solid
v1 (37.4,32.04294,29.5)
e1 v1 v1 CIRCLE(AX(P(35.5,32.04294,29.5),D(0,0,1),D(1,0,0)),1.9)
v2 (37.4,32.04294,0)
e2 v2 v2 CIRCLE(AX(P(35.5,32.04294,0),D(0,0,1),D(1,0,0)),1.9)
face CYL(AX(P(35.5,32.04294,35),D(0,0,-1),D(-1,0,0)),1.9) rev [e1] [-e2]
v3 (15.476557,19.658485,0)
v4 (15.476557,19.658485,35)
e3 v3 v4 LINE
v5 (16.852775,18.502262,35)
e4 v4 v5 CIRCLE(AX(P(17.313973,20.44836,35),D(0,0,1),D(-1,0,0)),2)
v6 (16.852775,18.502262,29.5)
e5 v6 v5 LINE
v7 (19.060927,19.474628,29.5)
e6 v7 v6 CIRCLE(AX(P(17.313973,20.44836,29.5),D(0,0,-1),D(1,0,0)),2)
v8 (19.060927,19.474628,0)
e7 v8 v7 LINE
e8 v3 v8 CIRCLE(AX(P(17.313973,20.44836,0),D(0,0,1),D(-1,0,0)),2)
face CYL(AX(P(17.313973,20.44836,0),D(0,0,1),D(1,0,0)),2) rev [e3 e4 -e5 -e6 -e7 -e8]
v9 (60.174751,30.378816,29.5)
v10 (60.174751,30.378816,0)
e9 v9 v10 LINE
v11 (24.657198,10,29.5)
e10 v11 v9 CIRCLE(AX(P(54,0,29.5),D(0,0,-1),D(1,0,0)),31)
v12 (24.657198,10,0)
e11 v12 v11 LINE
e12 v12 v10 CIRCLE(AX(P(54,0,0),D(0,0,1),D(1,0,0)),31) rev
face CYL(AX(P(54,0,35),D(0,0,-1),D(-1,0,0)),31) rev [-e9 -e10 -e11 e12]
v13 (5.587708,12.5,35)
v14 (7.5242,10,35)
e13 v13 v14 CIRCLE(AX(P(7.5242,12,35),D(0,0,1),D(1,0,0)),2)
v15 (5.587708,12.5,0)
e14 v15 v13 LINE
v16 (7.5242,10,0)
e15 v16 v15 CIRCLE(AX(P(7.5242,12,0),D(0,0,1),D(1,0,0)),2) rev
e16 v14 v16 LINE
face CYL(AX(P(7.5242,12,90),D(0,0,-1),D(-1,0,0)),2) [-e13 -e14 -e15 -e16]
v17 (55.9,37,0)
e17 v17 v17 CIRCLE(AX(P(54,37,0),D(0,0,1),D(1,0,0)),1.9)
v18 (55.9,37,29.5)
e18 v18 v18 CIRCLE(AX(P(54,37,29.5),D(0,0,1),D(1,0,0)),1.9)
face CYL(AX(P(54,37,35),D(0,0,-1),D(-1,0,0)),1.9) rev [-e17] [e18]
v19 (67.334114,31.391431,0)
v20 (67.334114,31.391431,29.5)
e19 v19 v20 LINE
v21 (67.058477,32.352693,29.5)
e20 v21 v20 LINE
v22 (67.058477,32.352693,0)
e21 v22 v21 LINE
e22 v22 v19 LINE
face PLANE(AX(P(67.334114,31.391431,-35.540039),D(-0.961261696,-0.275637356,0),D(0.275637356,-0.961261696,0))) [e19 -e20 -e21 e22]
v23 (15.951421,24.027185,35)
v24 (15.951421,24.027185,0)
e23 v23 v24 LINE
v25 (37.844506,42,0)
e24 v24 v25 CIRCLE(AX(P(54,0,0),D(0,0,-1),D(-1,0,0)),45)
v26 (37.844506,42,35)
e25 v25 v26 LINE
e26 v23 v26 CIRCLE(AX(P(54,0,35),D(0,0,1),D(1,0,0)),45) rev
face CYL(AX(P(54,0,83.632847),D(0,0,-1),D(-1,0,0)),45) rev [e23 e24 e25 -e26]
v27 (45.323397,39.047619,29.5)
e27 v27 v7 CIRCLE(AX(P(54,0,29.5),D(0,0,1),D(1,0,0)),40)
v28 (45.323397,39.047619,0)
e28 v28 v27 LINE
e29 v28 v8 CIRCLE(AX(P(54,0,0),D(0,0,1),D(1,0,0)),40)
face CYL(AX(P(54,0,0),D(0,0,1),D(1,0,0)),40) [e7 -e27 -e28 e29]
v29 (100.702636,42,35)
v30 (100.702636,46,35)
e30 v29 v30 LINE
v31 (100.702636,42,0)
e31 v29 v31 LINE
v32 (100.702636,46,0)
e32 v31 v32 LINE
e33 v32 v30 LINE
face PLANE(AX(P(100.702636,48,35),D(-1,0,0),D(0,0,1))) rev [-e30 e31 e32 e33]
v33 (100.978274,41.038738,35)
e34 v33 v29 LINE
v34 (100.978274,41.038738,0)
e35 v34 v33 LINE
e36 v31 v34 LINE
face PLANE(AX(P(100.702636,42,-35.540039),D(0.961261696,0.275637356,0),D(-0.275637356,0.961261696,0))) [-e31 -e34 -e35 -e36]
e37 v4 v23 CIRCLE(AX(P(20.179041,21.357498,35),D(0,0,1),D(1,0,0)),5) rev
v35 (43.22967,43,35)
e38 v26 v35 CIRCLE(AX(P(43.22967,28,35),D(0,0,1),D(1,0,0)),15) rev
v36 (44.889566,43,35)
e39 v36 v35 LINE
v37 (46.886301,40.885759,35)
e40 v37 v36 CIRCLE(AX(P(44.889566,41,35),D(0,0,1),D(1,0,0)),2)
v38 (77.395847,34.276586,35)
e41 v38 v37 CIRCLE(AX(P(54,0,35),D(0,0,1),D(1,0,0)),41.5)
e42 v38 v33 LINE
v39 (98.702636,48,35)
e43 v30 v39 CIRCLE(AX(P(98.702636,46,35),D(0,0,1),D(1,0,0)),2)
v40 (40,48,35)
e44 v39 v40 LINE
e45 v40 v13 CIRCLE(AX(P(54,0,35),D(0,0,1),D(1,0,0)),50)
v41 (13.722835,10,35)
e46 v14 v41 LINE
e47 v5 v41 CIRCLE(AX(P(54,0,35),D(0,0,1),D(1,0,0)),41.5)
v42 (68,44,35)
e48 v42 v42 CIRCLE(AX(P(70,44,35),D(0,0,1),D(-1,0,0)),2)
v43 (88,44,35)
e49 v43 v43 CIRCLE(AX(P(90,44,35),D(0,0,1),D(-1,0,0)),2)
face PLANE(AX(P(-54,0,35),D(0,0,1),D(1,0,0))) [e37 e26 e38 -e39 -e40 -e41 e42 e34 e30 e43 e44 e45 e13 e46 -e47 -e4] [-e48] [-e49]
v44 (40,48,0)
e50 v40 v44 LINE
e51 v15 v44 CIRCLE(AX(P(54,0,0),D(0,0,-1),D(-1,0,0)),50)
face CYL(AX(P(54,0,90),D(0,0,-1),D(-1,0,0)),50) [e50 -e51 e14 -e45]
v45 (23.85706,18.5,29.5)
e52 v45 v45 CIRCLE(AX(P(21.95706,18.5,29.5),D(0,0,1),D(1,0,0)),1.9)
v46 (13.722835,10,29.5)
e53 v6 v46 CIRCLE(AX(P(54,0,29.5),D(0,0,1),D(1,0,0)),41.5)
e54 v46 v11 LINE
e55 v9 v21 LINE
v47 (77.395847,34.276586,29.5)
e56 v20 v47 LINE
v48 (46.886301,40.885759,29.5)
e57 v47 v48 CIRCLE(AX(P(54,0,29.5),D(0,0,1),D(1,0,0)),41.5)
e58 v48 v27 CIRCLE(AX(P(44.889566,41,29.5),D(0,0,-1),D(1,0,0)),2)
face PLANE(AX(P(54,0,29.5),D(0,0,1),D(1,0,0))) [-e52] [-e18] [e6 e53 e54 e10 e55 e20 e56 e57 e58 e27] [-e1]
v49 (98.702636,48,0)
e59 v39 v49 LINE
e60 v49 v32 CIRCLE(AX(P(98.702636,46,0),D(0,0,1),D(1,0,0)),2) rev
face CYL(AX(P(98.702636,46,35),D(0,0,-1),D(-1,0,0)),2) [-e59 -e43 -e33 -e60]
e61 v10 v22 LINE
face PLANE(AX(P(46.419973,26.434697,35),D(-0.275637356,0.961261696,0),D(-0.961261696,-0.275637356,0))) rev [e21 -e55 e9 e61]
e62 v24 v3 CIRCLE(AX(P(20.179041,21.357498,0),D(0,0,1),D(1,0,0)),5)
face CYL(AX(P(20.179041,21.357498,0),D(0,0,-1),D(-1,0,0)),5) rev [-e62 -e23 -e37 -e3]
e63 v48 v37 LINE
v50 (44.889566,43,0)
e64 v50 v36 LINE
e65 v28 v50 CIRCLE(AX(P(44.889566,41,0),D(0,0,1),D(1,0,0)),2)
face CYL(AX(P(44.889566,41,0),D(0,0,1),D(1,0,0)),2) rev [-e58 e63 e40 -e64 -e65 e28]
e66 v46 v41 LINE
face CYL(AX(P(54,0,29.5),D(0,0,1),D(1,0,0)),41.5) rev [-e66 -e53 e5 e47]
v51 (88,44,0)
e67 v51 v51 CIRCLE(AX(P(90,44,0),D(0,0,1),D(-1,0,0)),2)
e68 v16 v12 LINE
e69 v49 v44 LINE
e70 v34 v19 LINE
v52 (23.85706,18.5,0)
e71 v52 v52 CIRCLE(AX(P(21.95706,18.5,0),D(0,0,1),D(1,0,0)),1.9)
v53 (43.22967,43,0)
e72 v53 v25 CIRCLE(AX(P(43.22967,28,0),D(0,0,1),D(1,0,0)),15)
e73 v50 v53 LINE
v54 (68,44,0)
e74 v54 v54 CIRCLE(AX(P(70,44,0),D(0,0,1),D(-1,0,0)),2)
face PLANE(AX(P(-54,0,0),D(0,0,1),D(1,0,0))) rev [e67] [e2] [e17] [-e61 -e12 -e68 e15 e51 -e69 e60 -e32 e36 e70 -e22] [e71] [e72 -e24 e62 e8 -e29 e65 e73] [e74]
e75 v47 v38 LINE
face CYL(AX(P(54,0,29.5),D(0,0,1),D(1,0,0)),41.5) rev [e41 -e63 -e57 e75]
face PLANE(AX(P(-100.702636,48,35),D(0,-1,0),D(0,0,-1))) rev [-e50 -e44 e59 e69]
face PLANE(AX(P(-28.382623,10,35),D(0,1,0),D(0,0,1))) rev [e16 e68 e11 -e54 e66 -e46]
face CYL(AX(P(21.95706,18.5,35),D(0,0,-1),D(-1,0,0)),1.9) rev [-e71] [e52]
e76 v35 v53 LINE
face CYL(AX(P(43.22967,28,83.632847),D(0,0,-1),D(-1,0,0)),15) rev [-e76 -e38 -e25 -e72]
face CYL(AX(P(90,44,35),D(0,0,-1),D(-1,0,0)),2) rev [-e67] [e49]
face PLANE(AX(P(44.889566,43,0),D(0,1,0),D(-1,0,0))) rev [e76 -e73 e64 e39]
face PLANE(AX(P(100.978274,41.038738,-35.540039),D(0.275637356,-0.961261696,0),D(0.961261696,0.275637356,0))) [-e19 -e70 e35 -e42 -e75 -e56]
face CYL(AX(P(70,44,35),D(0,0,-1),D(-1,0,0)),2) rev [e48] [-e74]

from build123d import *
from build123d.topology import SkipClean

# Parameters (mm, degrees)
SKETCH_1_R          = 1.9
SKETCH_1_R_2        = 2
EXTRUDE_1_DEPTH     = 35
EXTRUDE_2_DEPTH     = 35
CUT_EXTRUDE_1_DEPTH = 118.156356153
SKETCH_4_R          = 41.5
CUT_EXTRUDE_2_DEPTH = 5.5
SKETCH_5_R          = 31
CUT_EXTRUDE_3_DEPTH = 116.632442624
SKETCH_6_R          = 2
CUT_EXTRUDE_4_DEPTH = 90
EXTRUDE_3_DEPTH     = 35
FILLET_1_R          = 15
FILLET_2_R          = 5
FILLET_3_R          = 2
CUT_EXTRUDE_START   = -5.5
CUT_EXTRUDE_5_DEPTH = 5.5
EXTRUDE_START       = 5.5
SKETCH_9_R          = 1.9
EXTRUDE_4_DEPTH     = 5.5


with BuildPart() as part:
    # 草图1 → 凸台-拉伸1 (new body)
    with BuildSketch(Plane.XY):
        with BuildLine():
            Line((-46.419972715, 26.434696638), (-100.702636481, 42))
            Line((-100.702636481, 42), (-100.702636481, 48))
            Line((-100.702636481, 48), (100.702636481, 48))
            Line((100.702636481, 48), (100.702636481, 42))
            Line((100.702636481, 42), (46.419972715, 26.434696638))
            ThreePointArc((46.419972715, 26.434696638), (35.478614393, 20.327525063), (28.382623085, 10))
            Line((28.382623085, 10), (-28.382623085, 10))
            ThreePointArc((-28.382623085, 10), (-35.478614393, 20.327525063), (-46.419972715, 26.434696638))
        make_face()
        with Locations((-54, 37)):
            Circle(SKETCH_1_R, mode=Mode.SUBTRACT)
        with Locations((-35.5, 32.04293994)):
            Circle(SKETCH_1_R, mode=Mode.SUBTRACT)
        with Locations((-21.95706006, 18.5)):
            Circle(SKETCH_1_R, mode=Mode.SUBTRACT)
        with Locations(Location((21.95706006, 18.5, 0), (0, 0, 180))):
            Circle(SKETCH_1_R, mode=Mode.SUBTRACT)
        with Locations(Location((35.5, 32.04293994, 0), (0, 0, 180))):
            Circle(SKETCH_1_R, mode=Mode.SUBTRACT)
        with Locations(Location((54, 37, 0), (0, 0, 180))):
            Circle(SKETCH_1_R, mode=Mode.SUBTRACT)
        with Locations((-90, 44)):
            Circle(SKETCH_1_R_2, mode=Mode.SUBTRACT)
        with Locations((-70, 44)):
            Circle(SKETCH_1_R_2, mode=Mode.SUBTRACT)
        with Locations(Location((70, 44, 0), (0, 0, 180))):
            Circle(SKETCH_1_R_2, mode=Mode.SUBTRACT)
        with Locations(Location((90, 44, 0), (0, 0, 180))):
            Circle(SKETCH_1_R_2, mode=Mode.SUBTRACT)
    extrude(amount=EXTRUDE_1_DEPTH)

    # 草图2 → 凸台-拉伸2 (add)
    with BuildSketch(Plane.XY.offset(35)):
        Polygon((-100.702636481, 42), (-100.978273837, 41.038738304), (-67.334114479, 31.39143085), (-67.058477124, 32.352692546), align=None)
        Polygon((67.058477124, 32.352692546), (100.702636481, 42), (100.978273837, 41.038738304), (67.334114479, 31.39143085), align=None)
    extrude(amount=-EXTRUDE_2_DEPTH)

    # 草图3 → 切除-拉伸1 (cut, through all)
    with BuildSketch(Plane.XY.offset(35)):
        with BuildLine():
            Line((-6.641746516, 40.210125207), (-15.476556882, 19.658485028))
            ThreePointArc((-15.476556882, 19.658485028), (-17.211519663, 18.450985714), (-19.06092662, 19.474628401))
            ThreePointArc((-19.06092662, 19.474628401), (-30.09691848, 32.072460053), (-45.323396591, 39.047619048))
            ThreePointArc((-45.323396591, 39.047619048), (-46.877626016, 41.21821789), (-44.889566421, 43))
            Line((-44.889566421, 43), (-8.479162585, 43))
            ThreePointArc((-8.479162585, 43), (-6.808870756, 42.100056911), (-6.641746516, 40.210125207))
        make_face()
        with BuildLine():
            Line((-10.837416069, 17.789874793), (-1.837416069, 38.725781047))
            ThreePointArc((-1.837416069, 38.725781047), (0, 39.935906254), (1.837416069, 38.725781047))
            Line((1.837416069, 38.725781047), (10.837416069, 17.789874793))
            ThreePointArc((10.837416069, 17.789874793), (10.670291829, 15.899943089), (9, 15))
            Line((9, 15), (-9, 15))
            ThreePointArc((-9, 15), (-10.670291829, 15.899943089), (-10.837416069, 17.789874793))
        make_face()
        with BuildLine():
            Line((44.889566421, 43), (8.479162585, 43))
            ThreePointArc((8.479162585, 43), (6.808870756, 42.100056911), (6.641746516, 40.210125207))
            Line((6.641746516, 40.210125207), (15.476556882, 19.658485028))
            ThreePointArc((15.476556882, 19.658485028), (17.211519663, 18.450985714), (19.06092662, 19.474628401))
            ThreePointArc((19.06092662, 19.474628401), (30.09691848, 32.072460053), (45.323396591, 39.047619048))
            ThreePointArc((45.323396591, 39.047619048), (46.877626016, 41.21821789), (44.889566421, 43))
        make_face()
    extrude(amount=-CUT_EXTRUDE_1_DEPTH, mode=Mode.SUBTRACT)

    # 草图4 → 切除-拉伸2 (cut)
    with BuildSketch(Plane(origin=(0, 0, 0), x_dir=(-1, 0, 0), z_dir=(0, 0, -1))):
        with Locations((54, 0)):
            Circle(SKETCH_4_R)
        with Locations((-54, 0)):
            Circle(SKETCH_4_R)
    extrude(amount=-CUT_EXTRUDE_2_DEPTH, mode=Mode.SUBTRACT)

    # 草图5 → 切除-拉伸3 (cut, through all)
    with BuildSketch(Plane(origin=(0, 0, 5.5), x_dir=(-1, 0, 0), z_dir=(0, 0, -1))):
        with Locations((-54, 0)):
            Circle(SKETCH_5_R)
        with Locations((54, 0)):
            Circle(SKETCH_5_R)
    extrude(amount=-CUT_EXTRUDE_3_DEPTH, mode=Mode.SUBTRACT)

    # 草图6 → 切除-拉伸4 (cut)
    # profile 1 of 2: a face of its own
    with BuildSketch(Plane(origin=(0, 0, 0), x_dir=(-1, 0, 0), z_dir=(0, 0, -1))):
        with BuildLine():
            Line((112.236741432, 87.655163383), (-13.983884749, 87.655163383))
            Line((-13.983884749, 87.655163383), (-42.229785629, 48.594876825))
            ThreePointArc((-42.229785629, 48.594876825), (-41.111460254, 48.310304731), (-40, 48))
            Line((-40, 48), (100.702636481, 48))
            Line((100.702636481, 48), (100.702636481, 42))
            Line((100.702636481, 42), (100.978273837, 41.038738304))
            Line((100.978273837, 41.038738304), (77.395846699, 34.276586137))
            ThreePointArc((77.395846699, 34.276586137), (62.786203664, 40.559248331), (46.886301002, 40.88575897))
            ThreePointArc((46.886301002, 40.88575897), (46.343609415, 42.373229395), (44.889566421, 43))
            Line((44.889566421, 43), (8.479162585, 43))
            ThreePointArc((8.479162585, 43), (6.808870756, 42.100056911), (6.641746516, 40.210125207))
            Line((6.641746516, 40.210125207), (15.476556882, 19.658485028))
            ThreePointArc((15.476556882, 19.658485028), (16.027458608, 18.917059445), (16.852775325, 18.502261995))
            ThreePointArc((16.852775325, 18.502261995), (15.05508847, 14.336801105), (13.722835254, 10))
            Line((13.722835254, 10), (-5.010205144, 10))
            ThreePointArc((-5.010205144, 10), (-4.25319235, 5.0254481), (-4, 0))
            Line((-4, 0), (108.733946442, 6.013095543))
            Line((108.733946442, 6.013095543), (112.236741432, 87.655163383))
        make_face()
    # profile 2 of 2: a face of its own
    with BuildSketch(Plane(origin=(0, 0, 0), x_dir=(-1, 0, 0), z_dir=(0, 0, -1))):
        with BuildLine():
            Line((100.702636481, 48), (-40, 48))
            ThreePointArc((-40, 48), (-34.085108298, 45.862807246), (-28.485298356, 43))
            Line((-28.485298356, 43), (-8.479162585, 43))
            ThreePointArc((-8.479162585, 43), (-6.808870756, 42.100056911), (-6.641746516, 40.210125207))
            Line((-6.641746516, 40.210125207), (-12.159497891, 27.374666815))
            ThreePointArc((-12.159497891, 27.374666815), (-10.524900739, 24.696472303), (-9.061502157, 21.921026701))
            Line((-9.061502157, 21.921026701), (-1.837416069, 38.725781047))
            ThreePointArc((-1.837416069, 38.725781047), (0, 39.935906254), (1.837416069, 38.725781047))
            Line((1.837416069, 38.725781047), (10.837416069, 17.789874793))
            ThreePointArc((10.837416069, 17.789874793), (10.670291829, 15.899943089), (9, 15))
            Line((9, 15), (-6.303039929, 15))
            ThreePointArc((-6.303039929, 15), (-5.592023957, 12.516703058), (-5.010205144, 10))
            Line((-5.010205144, 10), (13.722835254, 10))
            ThreePointArc((13.722835254, 10), (15.05508847, 14.336801105), (16.852775325, 18.502261995))
            ThreePointArc((16.852775325, 18.502261995), (16.027458608, 18.917059445), (15.476556882, 19.658485028))
            Line((15.476556882, 19.658485028), (6.641746516, 40.210125207))
            ThreePointArc((6.641746516, 40.210125207), (6.808870756, 42.100056911), (8.479162585, 43))
            Line((8.479162585, 43), (44.889566421, 43))
            ThreePointArc((44.889566421, 43), (46.343609415, 42.373229395), (46.886301002, 40.88575897))
            ThreePointArc((46.886301002, 40.88575897), (62.786203664, 40.559248331), (77.395846699, 34.276586137))
            Line((77.395846699, 34.276586137), (100.978273837, 41.038738304))
            Line((100.978273837, 41.038738304), (100.702636481, 42))
            Line((100.702636481, 42), (100.702636481, 48))
        make_face()
        with Locations((70, 44)):
            Circle(SKETCH_6_R, mode=Mode.SUBTRACT)
        with Locations((90, 44)):
            Circle(SKETCH_6_R, mode=Mode.SUBTRACT)
    extrude(amount=-CUT_EXTRUDE_4_DEPTH, mode=Mode.SUBTRACT)

    # 草图7 → 凸台-拉伸3 (add)
    with SkipClean():  # the faces are left unmerged after this step: merging them gives an invalid solid
        with BuildSketch(Plane(origin=(0, 0, 0), x_dir=(-1, 0, 0), z_dir=(0, 0, -1))):
            with BuildLine():
                ThreePointArc((-5.010205144, 10), (-13.25714787, 28.983098529), (-28.485298356, 43))
                Line((-28.485298356, 43), (-40.733500839, 43))
                ThreePointArc((-40.733500839, 43), (-21.007081908, 30.601754129), (-10.125178063, 10))
                Line((-10.125178063, 10), (-5.010205144, 10))
            make_face()
        extrude(amount=-EXTRUDE_3_DEPTH)

    # 圆角1
    fillet_1_edges = [part.edges().sort_by_distance(p)[0] for p in [
        (40.733500839, 43, 17.5),
    ]]
    fillet(fillet_1_edges, radius=FILLET_1_R)

    # 圆角2
    # the kernel refuses this fillet: 5 mm, written as the material it adds along each edge
    with BuildSketch(Plane(origin=(14.589674395, 21.72156154, 35), x_dir=(0.3949373965823167, -0.9187080345685357, 0), z_dir=(0, 0, -1))) as fillet_2_piece_1:
        with BuildLine():
            CenterArc((2.541917953, -4.991213508), FILLET_2_R, 93.397222659, 52.136727531)
            ThreePointArc((-1.580390366, -2.16162447), (-0.806277224, -1.069054456), (0, 0))
            Line((0, 0), (2.245628028, 0))
        make_face()
    extrude(amount=35)

    # 圆角3
    fillet_3_edges = [part.edges().sort_by_distance(p)[0] for p in [
        (100.702636481, 48, 17.5),
        (5.010205144, 10, 17.5),
    ]]
    fillet(fillet_3_edges, radius=FILLET_3_R)

    # 草图8 → 切除-拉伸5 (cut)
    with BuildSketch(Plane.XY.offset(35).offset(CUT_EXTRUDE_START)):
        with BuildLine():
            Line((60.174750934, 30.378815825), (67.058477124, 32.352692546))
            Line((67.058477124, 32.352692546), (67.334114479, 31.39143085))
            Line((67.334114479, 31.39143085), (77.395846699, 34.276586137))
            ThreePointArc((77.395846699, 34.276586137), (62.786203664, 40.559248331), (46.886301002, 40.88575897))
            ThreePointArc((46.886301002, 40.88575897), (46.413246455, 39.704469547), (45.323396591, 39.047619048))
            ThreePointArc((45.323396591, 39.047619048), (30.09691848, 32.072460053), (19.06092662, 19.474628401))
            ThreePointArc((19.06092662, 19.474628401), (18.119991721, 18.61796813), (16.852775325, 18.502261995))
            ThreePointArc((16.852775325, 18.502261995), (15.05508847, 14.336801105), (13.722835254, 10))
            Line((13.722835254, 10), (24.657198498, 10))
            ThreePointArc((24.657198498, 10), (38.572308164, 26.888405022), (60.174750934, 30.378815825))
        make_face()
    extrude(amount=CUT_EXTRUDE_5_DEPTH, mode=Mode.SUBTRACT)

    # 草图9 → 凸台-拉伸4 (add)
    with BuildSketch(Plane(origin=(0, 0, 5.5), x_dir=(-1, 0, 0), z_dir=(0, 0, -1)).offset(EXTRUDE_START)):
        with BuildLine():
            Line((-67.058477124, 32.352692546), (-60.174750934, 30.378815825))
            ThreePointArc((-60.174750934, 30.378815825), (-38.572308164, 26.888405022), (-24.657198498, 10))
            Line((-24.657198498, 10), (-13.722835254, 10))
            ThreePointArc((-13.722835254, 10), (-15.05508847, 14.336801105), (-16.852775325, 18.502261995))
            ThreePointArc((-16.852775325, 18.502261995), (-18.119991721, 18.61796813), (-19.06092662, 19.474628401))
            ThreePointArc((-19.06092662, 19.474628401), (-30.09691848, 32.072460053), (-45.323396591, 39.047619048))
            ThreePointArc((-45.323396591, 39.047619048), (-46.413246455, 39.704469547), (-46.886301002, 40.88575897))
            ThreePointArc((-46.886301002, 40.88575897), (-62.786203664, 40.559248331), (-77.395846699, 34.276586137))
            Line((-77.395846699, 34.276586137), (-67.334114479, 31.39143085))
            Line((-67.334114479, 31.39143085), (-67.058477124, 32.352692546))
        make_face()
        with Locations(Location((-54, 37, 0), (0, 0, 180))):
            Circle(SKETCH_9_R, mode=Mode.SUBTRACT)
        with Locations(Location((-35.5, 32.04293994, 0), (0, 0, 180))):
            Circle(SKETCH_9_R, mode=Mode.SUBTRACT)
        with Locations(Location((-21.95706006, 18.5, 0), (0, 0, 180))):
            Circle(SKETCH_9_R, mode=Mode.SUBTRACT)
    extrude(amount=-EXTRUDE_4_DEPTH)


solid = part.part
